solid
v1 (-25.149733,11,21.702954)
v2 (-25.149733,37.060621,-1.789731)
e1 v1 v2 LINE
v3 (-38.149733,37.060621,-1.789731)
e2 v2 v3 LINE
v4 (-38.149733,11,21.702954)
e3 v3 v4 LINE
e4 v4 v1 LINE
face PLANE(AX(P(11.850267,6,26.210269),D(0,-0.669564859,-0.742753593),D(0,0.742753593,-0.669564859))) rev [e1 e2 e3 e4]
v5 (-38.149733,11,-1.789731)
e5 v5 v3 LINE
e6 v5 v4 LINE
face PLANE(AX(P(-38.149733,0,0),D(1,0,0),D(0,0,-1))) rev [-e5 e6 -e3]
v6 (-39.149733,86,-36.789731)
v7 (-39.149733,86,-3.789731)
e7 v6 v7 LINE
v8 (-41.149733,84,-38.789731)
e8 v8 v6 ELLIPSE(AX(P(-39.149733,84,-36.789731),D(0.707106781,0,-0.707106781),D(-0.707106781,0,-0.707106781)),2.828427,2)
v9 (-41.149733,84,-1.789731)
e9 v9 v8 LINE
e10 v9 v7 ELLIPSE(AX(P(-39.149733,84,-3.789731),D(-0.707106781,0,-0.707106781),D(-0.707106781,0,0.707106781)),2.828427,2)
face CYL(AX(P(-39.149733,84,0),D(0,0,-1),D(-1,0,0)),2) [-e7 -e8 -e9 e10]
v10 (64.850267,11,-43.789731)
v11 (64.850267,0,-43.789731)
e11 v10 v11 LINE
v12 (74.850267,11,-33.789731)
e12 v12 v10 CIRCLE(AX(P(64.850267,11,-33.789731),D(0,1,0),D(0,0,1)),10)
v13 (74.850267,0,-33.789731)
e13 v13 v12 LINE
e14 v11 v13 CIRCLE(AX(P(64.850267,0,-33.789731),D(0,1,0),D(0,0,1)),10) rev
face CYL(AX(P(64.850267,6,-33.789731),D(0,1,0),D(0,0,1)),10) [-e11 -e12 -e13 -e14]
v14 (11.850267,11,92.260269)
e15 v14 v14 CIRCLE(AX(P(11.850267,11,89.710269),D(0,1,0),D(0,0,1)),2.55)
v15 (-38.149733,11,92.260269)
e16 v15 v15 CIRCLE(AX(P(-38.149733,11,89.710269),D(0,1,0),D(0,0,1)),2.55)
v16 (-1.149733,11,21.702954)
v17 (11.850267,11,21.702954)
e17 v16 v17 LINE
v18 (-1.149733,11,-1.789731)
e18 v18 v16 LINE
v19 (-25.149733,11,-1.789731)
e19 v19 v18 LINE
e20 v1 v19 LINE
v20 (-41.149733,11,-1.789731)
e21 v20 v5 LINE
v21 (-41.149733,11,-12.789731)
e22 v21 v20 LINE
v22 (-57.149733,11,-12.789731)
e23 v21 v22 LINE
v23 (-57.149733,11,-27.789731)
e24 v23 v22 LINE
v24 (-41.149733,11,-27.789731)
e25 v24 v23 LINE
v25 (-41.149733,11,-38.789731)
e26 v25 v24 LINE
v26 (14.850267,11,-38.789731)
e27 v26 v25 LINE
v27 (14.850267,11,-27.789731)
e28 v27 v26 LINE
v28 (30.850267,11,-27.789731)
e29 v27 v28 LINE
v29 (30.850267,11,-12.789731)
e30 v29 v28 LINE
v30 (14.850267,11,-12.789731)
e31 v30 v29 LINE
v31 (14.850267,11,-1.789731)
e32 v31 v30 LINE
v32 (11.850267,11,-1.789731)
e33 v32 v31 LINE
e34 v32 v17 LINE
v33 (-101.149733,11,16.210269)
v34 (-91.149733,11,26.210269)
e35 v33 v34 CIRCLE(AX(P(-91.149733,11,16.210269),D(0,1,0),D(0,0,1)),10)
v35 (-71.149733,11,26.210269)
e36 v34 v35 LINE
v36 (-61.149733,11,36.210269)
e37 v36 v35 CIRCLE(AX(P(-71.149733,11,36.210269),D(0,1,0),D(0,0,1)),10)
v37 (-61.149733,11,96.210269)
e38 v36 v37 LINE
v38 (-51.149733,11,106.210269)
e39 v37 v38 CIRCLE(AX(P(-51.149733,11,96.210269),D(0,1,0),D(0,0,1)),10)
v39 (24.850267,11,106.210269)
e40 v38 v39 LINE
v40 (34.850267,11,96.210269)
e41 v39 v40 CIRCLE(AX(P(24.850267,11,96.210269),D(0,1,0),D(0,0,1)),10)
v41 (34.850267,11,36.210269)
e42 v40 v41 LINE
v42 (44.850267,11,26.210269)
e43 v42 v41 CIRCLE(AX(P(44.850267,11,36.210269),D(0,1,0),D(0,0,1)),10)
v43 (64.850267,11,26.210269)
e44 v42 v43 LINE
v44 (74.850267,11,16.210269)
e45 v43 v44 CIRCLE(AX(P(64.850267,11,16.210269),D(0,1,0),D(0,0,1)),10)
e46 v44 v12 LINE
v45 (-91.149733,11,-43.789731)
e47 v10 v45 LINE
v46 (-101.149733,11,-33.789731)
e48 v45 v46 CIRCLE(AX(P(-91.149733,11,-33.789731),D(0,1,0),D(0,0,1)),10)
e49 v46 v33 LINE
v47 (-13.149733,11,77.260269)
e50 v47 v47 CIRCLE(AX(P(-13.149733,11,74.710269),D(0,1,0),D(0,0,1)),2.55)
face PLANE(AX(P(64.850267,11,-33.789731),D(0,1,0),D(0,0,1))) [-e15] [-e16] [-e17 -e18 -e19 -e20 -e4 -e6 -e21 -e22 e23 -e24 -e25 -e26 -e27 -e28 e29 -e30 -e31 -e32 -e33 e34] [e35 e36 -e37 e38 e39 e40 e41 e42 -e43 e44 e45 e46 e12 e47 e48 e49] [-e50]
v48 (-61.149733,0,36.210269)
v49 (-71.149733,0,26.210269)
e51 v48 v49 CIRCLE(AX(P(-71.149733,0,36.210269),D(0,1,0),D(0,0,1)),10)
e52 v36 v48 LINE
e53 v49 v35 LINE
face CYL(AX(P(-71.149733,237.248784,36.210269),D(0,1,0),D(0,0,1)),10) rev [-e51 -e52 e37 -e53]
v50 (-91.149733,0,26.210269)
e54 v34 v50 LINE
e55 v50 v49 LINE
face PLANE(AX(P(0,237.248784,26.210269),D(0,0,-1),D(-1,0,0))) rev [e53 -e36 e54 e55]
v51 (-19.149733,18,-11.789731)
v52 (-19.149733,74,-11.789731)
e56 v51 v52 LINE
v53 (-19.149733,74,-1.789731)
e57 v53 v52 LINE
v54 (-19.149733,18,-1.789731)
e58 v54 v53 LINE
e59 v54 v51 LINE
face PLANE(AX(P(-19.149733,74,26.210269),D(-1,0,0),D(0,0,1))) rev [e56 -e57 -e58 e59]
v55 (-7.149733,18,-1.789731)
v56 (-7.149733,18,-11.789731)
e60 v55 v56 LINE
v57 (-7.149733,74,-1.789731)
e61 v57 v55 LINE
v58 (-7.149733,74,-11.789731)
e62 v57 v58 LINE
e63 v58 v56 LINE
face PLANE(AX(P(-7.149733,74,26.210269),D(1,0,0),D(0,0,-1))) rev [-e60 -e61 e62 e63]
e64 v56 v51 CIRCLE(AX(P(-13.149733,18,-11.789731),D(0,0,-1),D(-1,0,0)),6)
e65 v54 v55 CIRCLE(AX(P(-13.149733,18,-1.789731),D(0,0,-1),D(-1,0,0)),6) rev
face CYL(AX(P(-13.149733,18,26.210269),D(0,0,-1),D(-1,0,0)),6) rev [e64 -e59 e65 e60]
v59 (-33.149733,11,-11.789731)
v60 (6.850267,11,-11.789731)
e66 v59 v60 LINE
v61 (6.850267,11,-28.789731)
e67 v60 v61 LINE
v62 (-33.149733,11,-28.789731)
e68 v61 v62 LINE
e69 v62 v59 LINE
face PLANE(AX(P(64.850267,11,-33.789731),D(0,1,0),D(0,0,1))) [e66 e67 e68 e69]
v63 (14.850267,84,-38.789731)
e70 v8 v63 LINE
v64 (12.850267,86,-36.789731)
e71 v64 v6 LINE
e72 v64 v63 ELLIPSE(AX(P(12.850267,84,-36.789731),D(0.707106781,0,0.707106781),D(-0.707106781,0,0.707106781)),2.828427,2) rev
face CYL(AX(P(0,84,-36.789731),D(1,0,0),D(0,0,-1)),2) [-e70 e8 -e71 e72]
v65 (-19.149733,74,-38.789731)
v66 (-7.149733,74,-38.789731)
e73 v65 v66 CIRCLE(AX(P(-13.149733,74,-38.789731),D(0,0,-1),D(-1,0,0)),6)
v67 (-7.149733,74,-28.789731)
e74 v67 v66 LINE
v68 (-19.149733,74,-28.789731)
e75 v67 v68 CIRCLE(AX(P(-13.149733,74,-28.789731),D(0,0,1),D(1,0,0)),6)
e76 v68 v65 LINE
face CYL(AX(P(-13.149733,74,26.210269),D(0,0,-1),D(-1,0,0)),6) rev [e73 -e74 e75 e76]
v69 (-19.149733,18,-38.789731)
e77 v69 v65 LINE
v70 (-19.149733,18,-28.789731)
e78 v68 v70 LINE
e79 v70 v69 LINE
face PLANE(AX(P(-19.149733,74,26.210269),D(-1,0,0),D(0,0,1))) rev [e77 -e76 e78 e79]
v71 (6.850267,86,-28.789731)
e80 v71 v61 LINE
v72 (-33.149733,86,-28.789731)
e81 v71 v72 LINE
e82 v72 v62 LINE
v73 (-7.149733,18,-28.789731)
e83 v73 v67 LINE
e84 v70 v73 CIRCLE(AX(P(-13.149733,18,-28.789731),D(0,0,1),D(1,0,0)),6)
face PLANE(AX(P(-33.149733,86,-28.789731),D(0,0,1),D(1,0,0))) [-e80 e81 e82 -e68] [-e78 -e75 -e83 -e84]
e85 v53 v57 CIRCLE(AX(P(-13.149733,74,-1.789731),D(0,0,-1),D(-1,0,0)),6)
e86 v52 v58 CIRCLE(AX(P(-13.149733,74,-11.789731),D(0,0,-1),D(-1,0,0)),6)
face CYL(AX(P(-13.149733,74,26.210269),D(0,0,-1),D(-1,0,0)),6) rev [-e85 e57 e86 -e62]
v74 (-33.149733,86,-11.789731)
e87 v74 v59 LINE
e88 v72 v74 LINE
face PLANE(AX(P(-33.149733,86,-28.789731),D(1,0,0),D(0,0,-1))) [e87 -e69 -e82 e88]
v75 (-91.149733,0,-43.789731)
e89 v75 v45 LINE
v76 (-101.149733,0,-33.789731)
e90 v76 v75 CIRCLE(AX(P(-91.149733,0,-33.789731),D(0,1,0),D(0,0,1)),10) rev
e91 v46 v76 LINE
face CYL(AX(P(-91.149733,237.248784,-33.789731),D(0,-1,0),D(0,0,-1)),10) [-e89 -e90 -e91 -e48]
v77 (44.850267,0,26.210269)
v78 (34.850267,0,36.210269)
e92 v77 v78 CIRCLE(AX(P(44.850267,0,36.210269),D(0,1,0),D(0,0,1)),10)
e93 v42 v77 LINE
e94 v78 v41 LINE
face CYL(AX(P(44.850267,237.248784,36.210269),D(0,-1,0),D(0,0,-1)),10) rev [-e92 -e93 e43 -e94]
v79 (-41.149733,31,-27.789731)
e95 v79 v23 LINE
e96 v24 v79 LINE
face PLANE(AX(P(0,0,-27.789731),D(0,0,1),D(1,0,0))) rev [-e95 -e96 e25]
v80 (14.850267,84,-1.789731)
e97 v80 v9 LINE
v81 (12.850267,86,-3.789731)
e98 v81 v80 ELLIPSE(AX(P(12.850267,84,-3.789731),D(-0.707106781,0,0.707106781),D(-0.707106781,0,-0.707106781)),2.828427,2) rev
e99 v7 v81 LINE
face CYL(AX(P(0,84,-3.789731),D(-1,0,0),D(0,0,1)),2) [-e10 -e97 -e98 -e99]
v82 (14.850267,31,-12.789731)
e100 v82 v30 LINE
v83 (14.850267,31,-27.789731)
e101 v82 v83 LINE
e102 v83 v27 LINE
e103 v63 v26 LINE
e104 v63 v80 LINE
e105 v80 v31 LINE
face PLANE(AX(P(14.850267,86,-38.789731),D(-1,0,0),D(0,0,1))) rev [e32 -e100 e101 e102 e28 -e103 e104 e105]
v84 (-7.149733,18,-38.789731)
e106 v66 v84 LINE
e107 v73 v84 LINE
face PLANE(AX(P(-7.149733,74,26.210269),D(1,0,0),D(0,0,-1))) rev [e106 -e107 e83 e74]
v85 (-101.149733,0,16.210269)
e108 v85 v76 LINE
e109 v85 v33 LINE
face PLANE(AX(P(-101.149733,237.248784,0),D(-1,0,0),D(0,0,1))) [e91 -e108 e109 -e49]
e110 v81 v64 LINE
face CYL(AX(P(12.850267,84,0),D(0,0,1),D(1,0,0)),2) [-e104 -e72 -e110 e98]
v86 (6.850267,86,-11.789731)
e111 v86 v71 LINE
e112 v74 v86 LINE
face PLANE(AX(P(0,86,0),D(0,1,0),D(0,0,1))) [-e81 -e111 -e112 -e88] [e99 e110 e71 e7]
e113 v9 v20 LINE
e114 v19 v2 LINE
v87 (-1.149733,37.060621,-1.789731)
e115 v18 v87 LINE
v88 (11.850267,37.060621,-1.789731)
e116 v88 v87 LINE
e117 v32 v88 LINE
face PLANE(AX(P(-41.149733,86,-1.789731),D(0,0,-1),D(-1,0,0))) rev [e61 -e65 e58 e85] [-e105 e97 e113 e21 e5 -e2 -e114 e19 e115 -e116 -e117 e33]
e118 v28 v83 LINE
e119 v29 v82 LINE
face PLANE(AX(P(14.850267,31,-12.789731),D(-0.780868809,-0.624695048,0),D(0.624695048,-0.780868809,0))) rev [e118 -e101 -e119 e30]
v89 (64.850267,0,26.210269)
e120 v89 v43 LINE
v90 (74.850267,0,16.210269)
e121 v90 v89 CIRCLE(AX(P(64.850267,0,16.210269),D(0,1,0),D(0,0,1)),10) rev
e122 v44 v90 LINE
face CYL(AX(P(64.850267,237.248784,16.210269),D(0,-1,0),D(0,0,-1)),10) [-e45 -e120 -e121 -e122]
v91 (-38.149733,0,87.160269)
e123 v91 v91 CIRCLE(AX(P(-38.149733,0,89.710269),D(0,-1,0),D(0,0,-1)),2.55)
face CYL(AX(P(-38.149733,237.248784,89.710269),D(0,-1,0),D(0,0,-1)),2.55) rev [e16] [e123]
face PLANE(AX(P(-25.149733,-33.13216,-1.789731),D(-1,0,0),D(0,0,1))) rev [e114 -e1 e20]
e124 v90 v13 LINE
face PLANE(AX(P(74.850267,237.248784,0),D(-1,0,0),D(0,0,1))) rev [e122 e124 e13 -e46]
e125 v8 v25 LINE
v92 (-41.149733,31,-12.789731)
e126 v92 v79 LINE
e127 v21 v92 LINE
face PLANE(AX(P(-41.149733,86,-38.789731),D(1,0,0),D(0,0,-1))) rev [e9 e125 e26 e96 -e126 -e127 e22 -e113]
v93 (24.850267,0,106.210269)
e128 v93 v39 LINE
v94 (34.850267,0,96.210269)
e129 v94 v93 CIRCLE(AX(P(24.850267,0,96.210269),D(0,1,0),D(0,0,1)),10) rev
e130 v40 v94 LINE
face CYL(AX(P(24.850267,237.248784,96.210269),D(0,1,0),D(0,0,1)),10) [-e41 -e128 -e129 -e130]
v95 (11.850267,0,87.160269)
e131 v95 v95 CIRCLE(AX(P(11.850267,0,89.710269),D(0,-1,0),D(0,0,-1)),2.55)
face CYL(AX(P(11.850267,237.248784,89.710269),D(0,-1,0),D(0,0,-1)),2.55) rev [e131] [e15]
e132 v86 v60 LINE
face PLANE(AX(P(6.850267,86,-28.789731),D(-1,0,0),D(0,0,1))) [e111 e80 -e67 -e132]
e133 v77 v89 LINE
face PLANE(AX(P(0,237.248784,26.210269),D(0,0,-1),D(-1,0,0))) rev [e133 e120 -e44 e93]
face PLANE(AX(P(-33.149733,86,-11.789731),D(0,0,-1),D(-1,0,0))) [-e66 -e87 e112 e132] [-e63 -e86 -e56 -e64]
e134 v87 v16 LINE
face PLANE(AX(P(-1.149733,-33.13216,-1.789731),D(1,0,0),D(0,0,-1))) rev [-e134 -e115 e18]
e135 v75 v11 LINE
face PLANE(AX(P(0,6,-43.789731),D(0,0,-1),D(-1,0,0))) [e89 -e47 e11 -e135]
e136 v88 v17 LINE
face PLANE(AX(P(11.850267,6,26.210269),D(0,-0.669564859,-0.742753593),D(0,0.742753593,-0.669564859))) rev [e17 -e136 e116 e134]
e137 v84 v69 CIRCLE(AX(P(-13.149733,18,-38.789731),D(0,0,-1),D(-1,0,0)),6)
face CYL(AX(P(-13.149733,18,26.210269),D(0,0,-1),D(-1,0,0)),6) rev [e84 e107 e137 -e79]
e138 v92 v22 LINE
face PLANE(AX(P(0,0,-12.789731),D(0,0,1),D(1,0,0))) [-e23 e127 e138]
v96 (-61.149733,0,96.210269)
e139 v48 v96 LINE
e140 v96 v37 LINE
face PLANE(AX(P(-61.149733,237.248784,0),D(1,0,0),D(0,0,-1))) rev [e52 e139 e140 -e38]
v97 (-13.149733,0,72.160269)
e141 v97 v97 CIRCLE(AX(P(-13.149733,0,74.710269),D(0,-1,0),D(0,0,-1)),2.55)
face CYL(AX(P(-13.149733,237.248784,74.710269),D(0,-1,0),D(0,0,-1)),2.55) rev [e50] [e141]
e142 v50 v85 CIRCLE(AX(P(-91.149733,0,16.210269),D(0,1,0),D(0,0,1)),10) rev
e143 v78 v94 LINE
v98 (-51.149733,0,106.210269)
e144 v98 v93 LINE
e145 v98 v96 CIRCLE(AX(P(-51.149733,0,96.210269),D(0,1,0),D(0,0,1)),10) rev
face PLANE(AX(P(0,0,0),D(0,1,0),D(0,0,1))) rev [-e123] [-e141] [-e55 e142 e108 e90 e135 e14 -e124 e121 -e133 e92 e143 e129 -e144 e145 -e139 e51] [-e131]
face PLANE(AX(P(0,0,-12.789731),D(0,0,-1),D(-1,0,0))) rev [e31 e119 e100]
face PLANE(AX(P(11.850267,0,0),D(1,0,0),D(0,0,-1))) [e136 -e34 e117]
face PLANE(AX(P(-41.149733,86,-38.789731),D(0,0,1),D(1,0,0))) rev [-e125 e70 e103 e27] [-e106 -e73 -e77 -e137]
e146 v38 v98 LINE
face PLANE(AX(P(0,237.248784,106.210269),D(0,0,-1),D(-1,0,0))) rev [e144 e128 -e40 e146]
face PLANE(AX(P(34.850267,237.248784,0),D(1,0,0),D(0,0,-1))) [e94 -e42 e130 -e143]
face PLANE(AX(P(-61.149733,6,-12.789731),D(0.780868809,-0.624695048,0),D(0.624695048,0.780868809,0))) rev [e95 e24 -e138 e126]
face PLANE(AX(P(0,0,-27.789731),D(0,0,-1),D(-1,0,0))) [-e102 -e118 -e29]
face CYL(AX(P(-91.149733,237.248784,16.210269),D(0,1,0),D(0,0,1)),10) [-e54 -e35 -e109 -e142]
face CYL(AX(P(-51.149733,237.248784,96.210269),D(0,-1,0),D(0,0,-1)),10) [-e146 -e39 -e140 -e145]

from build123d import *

# Parameters (mm, degrees)
EXTRUDE_1_DEPTH     = 6
SKETCH_2_W          = 40
SKETCH_2_H          = 17
EXTRUDE_2_DEPTH     = 80
EXTRUDE_3_DEPTH     = 7.5
EXTRUDE_4_DEPTH     = 25
CUT_EXTRUDE_1_DEPTH = 124.93663618022231
CUT_EXTRUDE_2_DEPTH = 80
FILLET_1_R          = 2
SKETCH_11_R         = 2.549999999999998
SKETCH_11_W         = 176.00000000000006
SKETCH_11_H         = 70
EXTRUDE_5_DEPTH     = 6
FILLET_2_R          = 10
EXTRUDE_6_OUTLINE_R = 2.55
EXTRUDE_6_DEPTH     = 5


# Read off the part's stored shape, not the designer's step: 凸台-拉伸6
with BuildPart() as part:
    # 草图1 → 凸台-拉伸1 (new body)
    with BuildSketch(Plane(origin=(0, 0, 0), x_dir=(1, 0, 0), z_dir=(0, 1, 0))):
        Polygon((-61.14973252328083, 43.789730909681225), (-61.149732523280825, -26.210269090318775), (34.85026747671919, -26.210269090318782), (34.85026747671917, 43.789730909681225), align=None)
    extrude(amount=EXTRUDE_1_DEPTH)

    # 草图2 → 凸台-拉伸2 (add)
    with BuildSketch(Plane(origin=(0, 6, 0), x_dir=(1, 0, 0), z_dir=(0, 1, 0))):
        Polygon((-41.14973252328083, 38.78973090968122), (14.850267476719164, 38.78973090968122), (14.850267476719166, 1.7897309096812228), (-41.149732523280825, 1.7897309096812228), align=None)
        with Locations((-13.14973252328083, 20.289730909681225)):
            Rectangle(SKETCH_2_W, SKETCH_2_H, mode=Mode.SUBTRACT)
    extrude(amount=EXTRUDE_2_DEPTH)

    # 草图5 → 凸台-拉伸3 (add, symmetric)
    with BuildSketch(Plane.XY.offset(-20.289730909681218)):
        Polygon((-61.14973252328082, 6), (-41.149732523280825, 31), (-41.14973252328082, 6), align=None)
        Polygon((14.850267476719168, 30.999999999999996), (34.850267476719196, 6), (14.85026747671917, 6), align=None)
    extrude(amount=EXTRUDE_3_DEPTH, both=True)

    # 草图8 → 凸台-拉伸4 (add, symmetric)
    with BuildSketch(Plane(origin=(-13.149732523280829, 0, -1.23e-15), x_dir=(9e-17, 0, -1), z_dir=(1, 0, 9e-17))):
        Polygon((-26.21026909031878, 6), (1.7897309096812217, 37.0606214388455), (1.7897309096812242, 6), align=None)
    extrude(amount=EXTRUDE_4_DEPTH, both=True)

    # 草图9 → 切除-拉伸1 (cut, through all)
    with BuildSketch(Plane(origin=(0, 0, -38.78973090968122), x_dir=(-1, 0, 0), z_dir=(0, 0, -1))):
        with BuildLine():
            Line((19.149732523280832, 74.00000000000001), (19.149732523280832, 18.000000000000004))
            ThreePointArc((19.149732523280832, 18.000000000000004), (13.149732523280827, 12.000000000000002), (7.149732523280827, 18.000000000000004))
            Line((7.149732523280827, 18.000000000000004), (7.149732523280827, 74.00000000000001))
            ThreePointArc((7.149732523280827, 74.00000000000001), (13.149732523280829, 80.00000000000001), (19.149732523280832, 74.00000000000001))
        make_face()
    extrude(amount=-CUT_EXTRUDE_1_DEPTH, mode=Mode.SUBTRACT)

    # 草图10 → 切除-拉伸2 (cut)
    with BuildSketch(Plane(origin=(0, 86, 0), x_dir=(1, 0, 0), z_dir=(0, 1, 0))):
        Polygon((-25.14973252328083, 1.7897309096812328), (-1.1497325232808289, 1.7897309096812328), (-1.1497325232808246, -29.118616684918184), (-25.149732523280825, -29.118616684918184), align=None)
    extrude(amount=-CUT_EXTRUDE_2_DEPTH, mode=Mode.SUBTRACT)

    # 圆角1
    fillet_1_edges = [part.edges().sort_by_distance(p)[0] for p in [
        (14.850267476719164, 86, -20.28973090968122),
        (-13.149732523280832, 86, -38.78973090968122),
        (-41.14973252328083, 86, -20.289730909681218),
        (-13.14973252328083, 86, -1.7897309096812228),
    ]]
    fillet(fillet_1_edges, radius=FILLET_1_R)

    # 草图11 → 凸台-拉伸5 (add)
    # profile 1 of 3: a face of its own
    with BuildSketch(Plane.XZ):
        Polygon((-61.14973252328083, -43.789730909681225), (34.85026747671919, -43.789730909681225), (34.850267476719196, 106.21026909031877), (-61.14973252328083, 106.21026909031877), align=None)
        with Locations(Location((-38.14973252328083, 89.71026909031877, 0), (0, 0, 270))):
            Circle(SKETCH_11_R, mode=Mode.SUBTRACT)
        with Locations(Location((11.850267476719166, 89.71026909031877, 0), (0, 0, 270))):
            Circle(SKETCH_11_R, mode=Mode.SUBTRACT)
        with Locations(Location((-13.149732523280832, 74.71026909031877, 0), (0, 0, 270))):
            Circle(SKETCH_11_R, mode=Mode.SUBTRACT)
    # profile 2 of 3: a face of its own
    with BuildSketch(Plane.XZ):
        with Locations((-13.149732523280825, -8.789730909681222)):
            Rectangle(SKETCH_11_W, SKETCH_11_H)
    # profile 3 of 3: a face of its own
    with BuildSketch(Plane.XZ):
        Polygon((12.850267476719164, -36.78973090968122), (12.850267476719166, -3.789730909681223), (-39.14973252328082, -3.789730909681223), (-39.149732523280825, -36.78973090968122), align=None)
    extrude(amount=-EXTRUDE_5_DEPTH)

    # 圆角2
    fillet_2_edges = [part.edges().sort_by_distance(p)[0] for p in [
        (-61.149732523280825, 3, 26.21026909031878),
        (-61.14973252328083, 3, 106.21026909031877),
        (34.850267476719196, 3, 106.21026909031877),
        (34.85026747671919, 3, 26.21026909031878),
        (74.8502674767192, 3, 26.210269090318782),
        (74.8502674767192, 3, -43.789730909681225),
        (-101.14973252328083, 3, -43.789730909681225),
        (-101.14973252328083, 3, 26.210269090318782),
    ]]
    fillet(fillet_2_edges, radius=FILLET_2_R)

    # 凸台-拉伸6 outline → 凸台-拉伸6 (add)
    with BuildSketch(Plane(origin=(0, 6, 0), x_dir=(1, 0, 0), z_dir=(0, 1, 0))):
        with BuildLine():
            ThreePointArc((-61.149732523, -96.21026909), (-58.220800335, -103.281336902), (-51.149732523, -106.21026909))
            Line((-51.149732523, -106.21026909), (24.850267477, -106.21026909))
            ThreePointArc((24.850267477, -106.21026909), (31.921335289, -103.281336902), (34.850267477, -96.21026909))
            Line((34.850267477, -96.21026909), (34.850267477, -36.21026909))
            ThreePointArc((34.850267477, -36.21026909), (37.779199665, -29.139201278), (44.850267477, -26.21026909))
            Line((44.850267477, -26.21026909), (64.850267477, -26.21026909))
            ThreePointArc((64.850267477, -26.21026909), (71.921335289, -23.281336902), (74.850267477, -16.21026909))
            Line((74.850267477, -16.21026909), (74.850267477, 33.78973091))
            ThreePointArc((74.850267477, 33.78973091), (71.921335289, 40.860798722), (64.850267477, 43.78973091))
            Line((64.850267477, 43.78973091), (-91.149732523, 43.78973091))
            ThreePointArc((-91.149732523, 43.78973091), (-98.220800335, 40.860798722), (-101.149732523, 33.78973091))
            Line((-101.149732523, 33.78973091), (-101.149732523, -16.21026909))
            ThreePointArc((-101.149732523, -16.21026909), (-98.220800335, -23.281336902), (-91.149732523, -26.21026909))
            Line((-91.149732523, -26.21026909), (-71.149732523, -26.21026909))
            ThreePointArc((-71.149732523, -26.21026909), (-64.078664711, -29.139201278), (-61.149732523, -36.21026909))
            Line((-61.149732523, -36.21026909), (-61.149732523, -96.21026909))
        make_face()
        with Locations((-38.149732523, -89.71026909)):
            Circle(EXTRUDE_6_OUTLINE_R, mode=Mode.SUBTRACT)
        with Locations((11.850267477, -89.71026909)):
            Circle(EXTRUDE_6_OUTLINE_R, mode=Mode.SUBTRACT)
        with Locations((-13.149732523, -74.71026909)):
            Circle(EXTRUDE_6_OUTLINE_R, mode=Mode.SUBTRACT)
    extrude(amount=EXTRUDE_6_DEPTH)


solid = part.part
